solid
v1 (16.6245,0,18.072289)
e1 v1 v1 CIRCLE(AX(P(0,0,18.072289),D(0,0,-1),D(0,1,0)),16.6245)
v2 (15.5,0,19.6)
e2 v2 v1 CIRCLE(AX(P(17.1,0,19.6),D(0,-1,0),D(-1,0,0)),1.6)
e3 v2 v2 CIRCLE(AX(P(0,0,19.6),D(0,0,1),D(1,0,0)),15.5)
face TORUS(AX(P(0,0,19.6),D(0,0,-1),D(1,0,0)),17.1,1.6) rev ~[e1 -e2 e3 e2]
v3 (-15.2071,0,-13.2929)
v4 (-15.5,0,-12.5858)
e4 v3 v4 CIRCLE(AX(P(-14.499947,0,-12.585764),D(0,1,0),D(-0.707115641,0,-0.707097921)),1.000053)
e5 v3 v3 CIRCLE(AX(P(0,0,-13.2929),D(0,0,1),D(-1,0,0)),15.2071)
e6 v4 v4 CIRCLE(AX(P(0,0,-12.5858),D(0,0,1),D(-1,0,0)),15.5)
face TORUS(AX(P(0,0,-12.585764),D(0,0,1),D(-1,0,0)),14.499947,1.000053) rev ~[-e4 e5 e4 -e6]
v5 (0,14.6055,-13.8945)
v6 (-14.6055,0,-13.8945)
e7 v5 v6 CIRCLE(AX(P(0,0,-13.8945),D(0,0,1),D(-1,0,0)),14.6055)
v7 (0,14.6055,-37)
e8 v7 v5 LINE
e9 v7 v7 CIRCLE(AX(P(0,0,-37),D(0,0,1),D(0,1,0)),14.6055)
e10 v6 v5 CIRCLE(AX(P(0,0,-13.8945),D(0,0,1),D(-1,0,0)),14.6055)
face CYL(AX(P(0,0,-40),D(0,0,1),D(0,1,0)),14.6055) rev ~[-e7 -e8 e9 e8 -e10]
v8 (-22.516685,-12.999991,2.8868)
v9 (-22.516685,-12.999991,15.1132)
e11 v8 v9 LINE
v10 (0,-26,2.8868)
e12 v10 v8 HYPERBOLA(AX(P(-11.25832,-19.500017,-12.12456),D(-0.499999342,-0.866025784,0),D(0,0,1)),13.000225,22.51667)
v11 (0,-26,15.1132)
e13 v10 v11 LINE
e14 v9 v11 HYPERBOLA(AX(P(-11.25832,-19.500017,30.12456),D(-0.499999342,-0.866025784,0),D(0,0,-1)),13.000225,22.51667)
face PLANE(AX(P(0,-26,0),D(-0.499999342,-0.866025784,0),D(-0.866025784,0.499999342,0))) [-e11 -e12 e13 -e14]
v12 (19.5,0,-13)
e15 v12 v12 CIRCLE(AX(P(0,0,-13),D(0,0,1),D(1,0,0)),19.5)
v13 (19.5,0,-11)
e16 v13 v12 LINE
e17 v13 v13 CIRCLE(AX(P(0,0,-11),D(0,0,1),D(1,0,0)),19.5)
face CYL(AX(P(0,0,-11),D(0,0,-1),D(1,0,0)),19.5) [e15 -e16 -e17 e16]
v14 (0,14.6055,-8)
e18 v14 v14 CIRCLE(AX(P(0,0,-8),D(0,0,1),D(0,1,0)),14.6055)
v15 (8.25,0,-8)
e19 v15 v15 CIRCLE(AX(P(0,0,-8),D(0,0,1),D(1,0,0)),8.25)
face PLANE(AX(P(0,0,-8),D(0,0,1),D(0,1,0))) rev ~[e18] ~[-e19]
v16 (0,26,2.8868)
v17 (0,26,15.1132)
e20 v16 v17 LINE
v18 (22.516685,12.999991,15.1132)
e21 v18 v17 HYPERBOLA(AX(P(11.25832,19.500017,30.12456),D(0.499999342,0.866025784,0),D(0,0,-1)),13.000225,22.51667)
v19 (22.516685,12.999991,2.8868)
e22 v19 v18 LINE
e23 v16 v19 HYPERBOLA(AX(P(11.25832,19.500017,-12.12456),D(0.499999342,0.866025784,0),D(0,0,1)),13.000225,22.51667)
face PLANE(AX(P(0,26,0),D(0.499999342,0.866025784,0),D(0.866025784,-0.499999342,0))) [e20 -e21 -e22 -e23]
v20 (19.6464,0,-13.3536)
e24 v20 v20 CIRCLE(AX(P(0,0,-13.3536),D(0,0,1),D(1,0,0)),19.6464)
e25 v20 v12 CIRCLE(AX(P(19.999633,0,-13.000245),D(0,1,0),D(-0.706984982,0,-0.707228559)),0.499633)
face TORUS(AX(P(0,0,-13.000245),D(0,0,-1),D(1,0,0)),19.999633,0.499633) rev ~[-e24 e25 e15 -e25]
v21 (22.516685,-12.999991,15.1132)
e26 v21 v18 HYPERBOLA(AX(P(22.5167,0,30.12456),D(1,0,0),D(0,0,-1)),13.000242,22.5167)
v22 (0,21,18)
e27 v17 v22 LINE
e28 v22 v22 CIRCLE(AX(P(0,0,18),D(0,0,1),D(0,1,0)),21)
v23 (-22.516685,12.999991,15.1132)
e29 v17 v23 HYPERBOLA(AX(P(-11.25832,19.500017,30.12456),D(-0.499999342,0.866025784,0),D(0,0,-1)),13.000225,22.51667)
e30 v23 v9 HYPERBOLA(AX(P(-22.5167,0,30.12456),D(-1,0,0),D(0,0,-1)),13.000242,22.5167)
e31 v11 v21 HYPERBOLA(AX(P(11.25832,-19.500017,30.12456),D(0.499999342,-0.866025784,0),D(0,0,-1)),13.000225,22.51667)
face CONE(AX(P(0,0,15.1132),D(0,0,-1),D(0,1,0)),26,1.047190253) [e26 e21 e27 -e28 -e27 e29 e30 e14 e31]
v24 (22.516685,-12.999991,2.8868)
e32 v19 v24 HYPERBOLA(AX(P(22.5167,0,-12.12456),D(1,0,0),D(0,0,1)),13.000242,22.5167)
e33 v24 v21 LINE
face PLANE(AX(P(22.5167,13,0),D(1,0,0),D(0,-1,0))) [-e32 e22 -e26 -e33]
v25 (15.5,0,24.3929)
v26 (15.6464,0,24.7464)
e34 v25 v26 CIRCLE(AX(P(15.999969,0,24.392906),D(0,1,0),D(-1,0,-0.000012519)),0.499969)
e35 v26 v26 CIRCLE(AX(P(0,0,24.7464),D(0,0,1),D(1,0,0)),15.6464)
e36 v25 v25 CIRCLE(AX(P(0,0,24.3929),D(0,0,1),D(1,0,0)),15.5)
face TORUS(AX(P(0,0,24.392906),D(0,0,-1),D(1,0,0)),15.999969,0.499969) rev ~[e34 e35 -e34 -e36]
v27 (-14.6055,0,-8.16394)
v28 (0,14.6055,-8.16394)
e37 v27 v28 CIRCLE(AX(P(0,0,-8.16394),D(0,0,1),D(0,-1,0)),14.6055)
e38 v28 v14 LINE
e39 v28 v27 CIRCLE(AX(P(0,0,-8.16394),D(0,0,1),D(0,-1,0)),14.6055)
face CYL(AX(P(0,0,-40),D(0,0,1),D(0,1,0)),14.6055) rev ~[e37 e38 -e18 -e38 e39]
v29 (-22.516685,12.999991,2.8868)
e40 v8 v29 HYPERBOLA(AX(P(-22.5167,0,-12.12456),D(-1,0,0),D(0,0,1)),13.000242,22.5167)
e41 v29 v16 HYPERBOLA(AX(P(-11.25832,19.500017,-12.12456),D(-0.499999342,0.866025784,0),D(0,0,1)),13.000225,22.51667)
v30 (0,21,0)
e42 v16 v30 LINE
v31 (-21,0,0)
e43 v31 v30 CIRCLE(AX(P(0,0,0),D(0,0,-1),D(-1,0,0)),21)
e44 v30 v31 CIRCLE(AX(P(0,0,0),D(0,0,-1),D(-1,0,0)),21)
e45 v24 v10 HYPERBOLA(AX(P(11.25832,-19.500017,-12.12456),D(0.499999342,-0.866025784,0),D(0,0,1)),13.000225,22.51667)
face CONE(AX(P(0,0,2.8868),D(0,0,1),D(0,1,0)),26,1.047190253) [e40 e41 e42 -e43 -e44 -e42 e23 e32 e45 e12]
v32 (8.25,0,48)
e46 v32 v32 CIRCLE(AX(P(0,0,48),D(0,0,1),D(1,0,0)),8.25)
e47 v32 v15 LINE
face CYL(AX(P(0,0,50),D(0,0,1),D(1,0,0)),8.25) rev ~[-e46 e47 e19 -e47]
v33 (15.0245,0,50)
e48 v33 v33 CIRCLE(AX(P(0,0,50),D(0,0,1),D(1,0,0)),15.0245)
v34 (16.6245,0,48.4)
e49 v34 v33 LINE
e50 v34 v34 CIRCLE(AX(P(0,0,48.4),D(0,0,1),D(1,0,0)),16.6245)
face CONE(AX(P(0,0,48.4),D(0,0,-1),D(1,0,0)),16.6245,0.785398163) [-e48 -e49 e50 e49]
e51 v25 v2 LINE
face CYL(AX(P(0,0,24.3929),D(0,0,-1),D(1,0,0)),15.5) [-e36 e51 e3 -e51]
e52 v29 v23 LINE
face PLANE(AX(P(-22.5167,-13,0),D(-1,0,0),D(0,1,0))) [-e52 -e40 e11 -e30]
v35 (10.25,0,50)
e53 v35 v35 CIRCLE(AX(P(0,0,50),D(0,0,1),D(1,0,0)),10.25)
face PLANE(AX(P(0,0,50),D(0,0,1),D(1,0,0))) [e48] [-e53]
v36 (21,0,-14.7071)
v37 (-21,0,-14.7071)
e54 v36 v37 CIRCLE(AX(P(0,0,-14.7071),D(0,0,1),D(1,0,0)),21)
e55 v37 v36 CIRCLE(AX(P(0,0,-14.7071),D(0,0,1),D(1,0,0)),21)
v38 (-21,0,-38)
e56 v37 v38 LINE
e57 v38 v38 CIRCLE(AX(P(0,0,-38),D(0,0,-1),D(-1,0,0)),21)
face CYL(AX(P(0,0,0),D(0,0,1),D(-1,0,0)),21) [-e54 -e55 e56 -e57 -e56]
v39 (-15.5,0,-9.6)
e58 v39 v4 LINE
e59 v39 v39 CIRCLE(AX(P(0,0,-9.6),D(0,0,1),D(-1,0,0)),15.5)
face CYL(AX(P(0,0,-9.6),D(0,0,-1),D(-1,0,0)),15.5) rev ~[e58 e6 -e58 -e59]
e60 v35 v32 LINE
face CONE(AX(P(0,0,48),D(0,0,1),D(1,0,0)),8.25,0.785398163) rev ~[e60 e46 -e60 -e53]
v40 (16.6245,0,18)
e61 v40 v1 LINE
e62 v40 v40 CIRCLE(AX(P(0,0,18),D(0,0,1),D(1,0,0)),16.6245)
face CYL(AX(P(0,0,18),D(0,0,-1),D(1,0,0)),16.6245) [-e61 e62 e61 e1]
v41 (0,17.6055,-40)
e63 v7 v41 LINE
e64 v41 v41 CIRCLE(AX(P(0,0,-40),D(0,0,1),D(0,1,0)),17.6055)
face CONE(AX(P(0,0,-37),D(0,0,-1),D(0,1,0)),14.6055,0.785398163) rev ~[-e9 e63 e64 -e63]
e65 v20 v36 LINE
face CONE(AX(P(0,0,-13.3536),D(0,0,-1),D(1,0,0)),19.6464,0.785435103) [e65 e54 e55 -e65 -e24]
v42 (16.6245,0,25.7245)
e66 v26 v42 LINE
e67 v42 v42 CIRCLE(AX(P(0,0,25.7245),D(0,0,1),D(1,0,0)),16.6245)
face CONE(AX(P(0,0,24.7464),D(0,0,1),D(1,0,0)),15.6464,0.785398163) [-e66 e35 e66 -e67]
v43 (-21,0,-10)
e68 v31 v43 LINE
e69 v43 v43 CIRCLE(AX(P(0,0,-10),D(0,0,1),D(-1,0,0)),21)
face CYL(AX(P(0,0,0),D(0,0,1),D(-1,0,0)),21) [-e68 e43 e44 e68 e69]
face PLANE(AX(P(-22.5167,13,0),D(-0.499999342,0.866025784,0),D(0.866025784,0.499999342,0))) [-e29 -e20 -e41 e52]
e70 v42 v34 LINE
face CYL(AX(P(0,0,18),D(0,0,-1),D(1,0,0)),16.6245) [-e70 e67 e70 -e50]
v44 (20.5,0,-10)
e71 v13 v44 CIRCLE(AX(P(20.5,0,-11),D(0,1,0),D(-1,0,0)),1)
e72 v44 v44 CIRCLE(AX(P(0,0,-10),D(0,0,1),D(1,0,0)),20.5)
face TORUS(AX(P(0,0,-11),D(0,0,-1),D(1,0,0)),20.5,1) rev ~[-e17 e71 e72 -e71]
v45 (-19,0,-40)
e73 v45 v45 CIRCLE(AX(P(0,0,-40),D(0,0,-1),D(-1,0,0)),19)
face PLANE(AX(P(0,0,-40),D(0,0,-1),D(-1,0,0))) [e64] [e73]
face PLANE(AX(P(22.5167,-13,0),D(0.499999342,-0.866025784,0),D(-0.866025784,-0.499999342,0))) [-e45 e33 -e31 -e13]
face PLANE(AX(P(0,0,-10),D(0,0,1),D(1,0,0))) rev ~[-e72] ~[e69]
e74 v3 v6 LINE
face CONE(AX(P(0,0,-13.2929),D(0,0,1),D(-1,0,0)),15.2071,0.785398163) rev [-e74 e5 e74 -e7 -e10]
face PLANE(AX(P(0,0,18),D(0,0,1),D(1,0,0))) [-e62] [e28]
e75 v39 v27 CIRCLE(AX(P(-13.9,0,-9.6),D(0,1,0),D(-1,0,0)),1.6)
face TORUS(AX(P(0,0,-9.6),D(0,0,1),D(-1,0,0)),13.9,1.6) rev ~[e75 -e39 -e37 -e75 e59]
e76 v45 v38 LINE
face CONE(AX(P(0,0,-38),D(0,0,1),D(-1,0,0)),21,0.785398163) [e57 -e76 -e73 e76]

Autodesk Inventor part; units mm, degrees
ref_plane "YZ Plane" through (0, 0, 0) normal (1, 0, 0) x (0, 1, 0)
ref_plane "XZ Plane" through (0, 0, 0) normal (0, 1, 0) x (-1, 0, 0)
ref_plane "XY Plane" through (0, 0, 0) normal (0, 0, 1) x (1, 0, 0)
sketch "Эскиз1" plane through (0, 0, 0) normal (0, 0, 1) x (1, 0, 0)
  line L0 (0, 26) -> (22.5167, 13)
  line L1 (22.5167, 13) -> (22.5167, -13)
  line L2 (22.5167, -13) -> (0, -26)
  line L3 (0, -26) -> (-22.5167, -13)
  line L4 (-22.5167, -13) -> (-22.5167, 13)
  line L5 (-22.5167, 13) -> (0, 26)
  point P0 (0, 0)
  point P1 (0, 0)
  dimension "d0" = 52
extrude "Выдавливание1" add sketch "Эскиз1" along normal blind 18
sketch "Эскиз2" plane through (0, 0, 18) normal (0, 0, 1) x (1, 0, 0)
  circle A0 centre (0, 0) radius 16.6245
  dimension "d3" = 33.249
sketch "Эскиз3" plane through (0, 0, 0) normal (0, 0, -1) x (-1, 0, 0)
  circle A0 centre (0, 0) radius 21
  dimension "d4" = 42
extrude "Выдавливание2" add sketch "Эскиз3" along normal blind 40
extrude "Выдавливание3" add sketch "Эскиз2" along normal blind 32
sketch "Эскиз4" plane through (0, 0, 50) normal (0, 0, 1) x (1, 0, 0)
  circle A0 centre (0, 0) radius 8.25
  dimension "d9" = 16.5
sketch "Эскиз5" plane through (0, 0, -40) normal (0, 0, -1) x (-1, 0, 0)
  point P0 (0, 0)
  point P1 (0, 0)
hole "Отверстие1" at (0, 0, -40) direction (0, 0, 1) diameter 29.211 depth 32 thread size "M33x3.5" class "6H" standard "ISO Metric profile"
extrude "Выдавливание4" cut sketch "Эскиз4" against normal through all
thread "Резьба1" size "G33.249x2.309" designation "G 1" class "A" standard "ISO Pipe Threads" full length
thread "Резьба2" size "M42x4.5" class "6g" standard "ANSI Metric M Profile" length 30
sketch "Эскиз6" plane through (0, 0, 0) normal (1, 0, 0) x (0, 1, 0)
  line L0 (26, 0) -> (26, 18) projected
  line L1 (13, 18) -> (26, 18) projected
  line L2 (26, 0) -> (13, 0) projected
  line L3 (26, 15.1132) -> (21, 18)
  line L4 (26, 2.8868) -> (21, 0)
  line L5 (0, -58) -> (0, 68) projected
  point P0 (0, 0)
  dimension "d25" = 21
  dimension "d26" = 30
  dimension "d27" = 30
revolve "Вращение1" cut sketch "Эскиз6" angle 360 about axis through (0, 0, -10) along (0, 0, 1)
sketch "Эскиз7" plane through (0, 0, 0) normal (0, 1, 0) x (-1, 0, 0)
  line L0 (-16.6245, 18) -> (-16.6245, 50) projected
  line L1 (21, 18) -> (-21, 18) projected
  line L2 (-15.6464, 24.7464) -> (-16.6245, 25.7245)
  line L3 (-15.5, 24.3929) -> (-15.5, 19.6)
  line L4 (-16.6245, 18) -> (16.6245, 18) projected
  arc A0 (-17.1, 18) -> (-15.5, 19.6) centre (-17.1, 19.6) ccw
  arc A1 (-15.5, 24.3929) -> (-15.6464, 24.7464) centre (-16, 24.3929) ccw
  line L5 (15.5, -9.6) -> (15.5, -12.5858)
  line L6 (15.2071, -13.2929) -> (14.6055, -13.8945)
  line L7 (14.6055, -8) -> (14.6055, -40) projected
  line L8 (-14.6055, -8) -> (14.6055, -8) projected
  line L9 (13.9, -8) -> (13.4971, -8)
  arc A2 (15.5, -9.6) -> (13.9, -8) centre (13.9, -9.6) ccw
  arc A3 (15.2071, -13.2929) -> (15.5, -12.5858) centre (14.5, -12.5858) ccw
  line L10 (-21, -10) -> (-20.5, -10)
  line L11 (-19.5, -11) -> (-19.5, -13)
  line L12 (-19.6464, -13.3536) -> (-21, -14.7071)
  arc A4 (-19.5, -11) -> (-20.5, -10) centre (-20.5, -11) ccw
  arc A5 (-19.6464, -13.3536) -> (-19.5, -13) centre (-20, -13) ccw
  line L13 (-21, 0) -> (-21, -40) projected
  line L14 (14.6055, -13.8945) -> (13.4971, -8)
  line L15 (-21, -10) -> (-21, -14.7071)
  line L16 (-16.6245, 25.7245) -> (-17.1, 18)
  line L17 (0, -58) -> (0, 68) projected
  point P0 (0, 0)
  point P1 (-15.5, 24.6)
  point P2 (-15.5, 18)
  point P3 (15.5, -8)
  point P4 (15.5, -13)
  dimension "d29" = 31
  dimension "d30" = 45
  dimension "d31" = 1.6
  dimension "d32" = 5
  dimension "d33" = 0.5
  dimension "d34" = 31
  dimension "d35" = 45
  dimension "d36" = 1.6
  dimension "d37" = 5
  dimension "d38" = 1
  dimension "d39" = 45
  dimension "d40" = 1
  dimension "d41" = 0.5
  dimension "d42" = 3
  dimension "d43" = 30
  dimension "d44" = 39
revolve "Вращение2" cut sketch "Эскиз7" angle 360 about axis through (0, 0, -10) along (0, 0, 1) contours A0 L16 L0 | L0 L2 A1 L3 A0 | L5 A3 L6 L7 A2 | L7 L14 L8 A2 | L10 A4 L11 A5 L12 L13
chamfer "Фаска1" distance 1.6 angle 45 1 edges at (-16.6245, 0, 50)
chamfer "Фаска2" distance 2 angle 45 2 edges at (-8.25, 0, 50) (21, 0, -40)
chamfer "Фаска3" distance 3 angle 45 1 edges at (0, -14.6055, -40)
properties material "Вода"
